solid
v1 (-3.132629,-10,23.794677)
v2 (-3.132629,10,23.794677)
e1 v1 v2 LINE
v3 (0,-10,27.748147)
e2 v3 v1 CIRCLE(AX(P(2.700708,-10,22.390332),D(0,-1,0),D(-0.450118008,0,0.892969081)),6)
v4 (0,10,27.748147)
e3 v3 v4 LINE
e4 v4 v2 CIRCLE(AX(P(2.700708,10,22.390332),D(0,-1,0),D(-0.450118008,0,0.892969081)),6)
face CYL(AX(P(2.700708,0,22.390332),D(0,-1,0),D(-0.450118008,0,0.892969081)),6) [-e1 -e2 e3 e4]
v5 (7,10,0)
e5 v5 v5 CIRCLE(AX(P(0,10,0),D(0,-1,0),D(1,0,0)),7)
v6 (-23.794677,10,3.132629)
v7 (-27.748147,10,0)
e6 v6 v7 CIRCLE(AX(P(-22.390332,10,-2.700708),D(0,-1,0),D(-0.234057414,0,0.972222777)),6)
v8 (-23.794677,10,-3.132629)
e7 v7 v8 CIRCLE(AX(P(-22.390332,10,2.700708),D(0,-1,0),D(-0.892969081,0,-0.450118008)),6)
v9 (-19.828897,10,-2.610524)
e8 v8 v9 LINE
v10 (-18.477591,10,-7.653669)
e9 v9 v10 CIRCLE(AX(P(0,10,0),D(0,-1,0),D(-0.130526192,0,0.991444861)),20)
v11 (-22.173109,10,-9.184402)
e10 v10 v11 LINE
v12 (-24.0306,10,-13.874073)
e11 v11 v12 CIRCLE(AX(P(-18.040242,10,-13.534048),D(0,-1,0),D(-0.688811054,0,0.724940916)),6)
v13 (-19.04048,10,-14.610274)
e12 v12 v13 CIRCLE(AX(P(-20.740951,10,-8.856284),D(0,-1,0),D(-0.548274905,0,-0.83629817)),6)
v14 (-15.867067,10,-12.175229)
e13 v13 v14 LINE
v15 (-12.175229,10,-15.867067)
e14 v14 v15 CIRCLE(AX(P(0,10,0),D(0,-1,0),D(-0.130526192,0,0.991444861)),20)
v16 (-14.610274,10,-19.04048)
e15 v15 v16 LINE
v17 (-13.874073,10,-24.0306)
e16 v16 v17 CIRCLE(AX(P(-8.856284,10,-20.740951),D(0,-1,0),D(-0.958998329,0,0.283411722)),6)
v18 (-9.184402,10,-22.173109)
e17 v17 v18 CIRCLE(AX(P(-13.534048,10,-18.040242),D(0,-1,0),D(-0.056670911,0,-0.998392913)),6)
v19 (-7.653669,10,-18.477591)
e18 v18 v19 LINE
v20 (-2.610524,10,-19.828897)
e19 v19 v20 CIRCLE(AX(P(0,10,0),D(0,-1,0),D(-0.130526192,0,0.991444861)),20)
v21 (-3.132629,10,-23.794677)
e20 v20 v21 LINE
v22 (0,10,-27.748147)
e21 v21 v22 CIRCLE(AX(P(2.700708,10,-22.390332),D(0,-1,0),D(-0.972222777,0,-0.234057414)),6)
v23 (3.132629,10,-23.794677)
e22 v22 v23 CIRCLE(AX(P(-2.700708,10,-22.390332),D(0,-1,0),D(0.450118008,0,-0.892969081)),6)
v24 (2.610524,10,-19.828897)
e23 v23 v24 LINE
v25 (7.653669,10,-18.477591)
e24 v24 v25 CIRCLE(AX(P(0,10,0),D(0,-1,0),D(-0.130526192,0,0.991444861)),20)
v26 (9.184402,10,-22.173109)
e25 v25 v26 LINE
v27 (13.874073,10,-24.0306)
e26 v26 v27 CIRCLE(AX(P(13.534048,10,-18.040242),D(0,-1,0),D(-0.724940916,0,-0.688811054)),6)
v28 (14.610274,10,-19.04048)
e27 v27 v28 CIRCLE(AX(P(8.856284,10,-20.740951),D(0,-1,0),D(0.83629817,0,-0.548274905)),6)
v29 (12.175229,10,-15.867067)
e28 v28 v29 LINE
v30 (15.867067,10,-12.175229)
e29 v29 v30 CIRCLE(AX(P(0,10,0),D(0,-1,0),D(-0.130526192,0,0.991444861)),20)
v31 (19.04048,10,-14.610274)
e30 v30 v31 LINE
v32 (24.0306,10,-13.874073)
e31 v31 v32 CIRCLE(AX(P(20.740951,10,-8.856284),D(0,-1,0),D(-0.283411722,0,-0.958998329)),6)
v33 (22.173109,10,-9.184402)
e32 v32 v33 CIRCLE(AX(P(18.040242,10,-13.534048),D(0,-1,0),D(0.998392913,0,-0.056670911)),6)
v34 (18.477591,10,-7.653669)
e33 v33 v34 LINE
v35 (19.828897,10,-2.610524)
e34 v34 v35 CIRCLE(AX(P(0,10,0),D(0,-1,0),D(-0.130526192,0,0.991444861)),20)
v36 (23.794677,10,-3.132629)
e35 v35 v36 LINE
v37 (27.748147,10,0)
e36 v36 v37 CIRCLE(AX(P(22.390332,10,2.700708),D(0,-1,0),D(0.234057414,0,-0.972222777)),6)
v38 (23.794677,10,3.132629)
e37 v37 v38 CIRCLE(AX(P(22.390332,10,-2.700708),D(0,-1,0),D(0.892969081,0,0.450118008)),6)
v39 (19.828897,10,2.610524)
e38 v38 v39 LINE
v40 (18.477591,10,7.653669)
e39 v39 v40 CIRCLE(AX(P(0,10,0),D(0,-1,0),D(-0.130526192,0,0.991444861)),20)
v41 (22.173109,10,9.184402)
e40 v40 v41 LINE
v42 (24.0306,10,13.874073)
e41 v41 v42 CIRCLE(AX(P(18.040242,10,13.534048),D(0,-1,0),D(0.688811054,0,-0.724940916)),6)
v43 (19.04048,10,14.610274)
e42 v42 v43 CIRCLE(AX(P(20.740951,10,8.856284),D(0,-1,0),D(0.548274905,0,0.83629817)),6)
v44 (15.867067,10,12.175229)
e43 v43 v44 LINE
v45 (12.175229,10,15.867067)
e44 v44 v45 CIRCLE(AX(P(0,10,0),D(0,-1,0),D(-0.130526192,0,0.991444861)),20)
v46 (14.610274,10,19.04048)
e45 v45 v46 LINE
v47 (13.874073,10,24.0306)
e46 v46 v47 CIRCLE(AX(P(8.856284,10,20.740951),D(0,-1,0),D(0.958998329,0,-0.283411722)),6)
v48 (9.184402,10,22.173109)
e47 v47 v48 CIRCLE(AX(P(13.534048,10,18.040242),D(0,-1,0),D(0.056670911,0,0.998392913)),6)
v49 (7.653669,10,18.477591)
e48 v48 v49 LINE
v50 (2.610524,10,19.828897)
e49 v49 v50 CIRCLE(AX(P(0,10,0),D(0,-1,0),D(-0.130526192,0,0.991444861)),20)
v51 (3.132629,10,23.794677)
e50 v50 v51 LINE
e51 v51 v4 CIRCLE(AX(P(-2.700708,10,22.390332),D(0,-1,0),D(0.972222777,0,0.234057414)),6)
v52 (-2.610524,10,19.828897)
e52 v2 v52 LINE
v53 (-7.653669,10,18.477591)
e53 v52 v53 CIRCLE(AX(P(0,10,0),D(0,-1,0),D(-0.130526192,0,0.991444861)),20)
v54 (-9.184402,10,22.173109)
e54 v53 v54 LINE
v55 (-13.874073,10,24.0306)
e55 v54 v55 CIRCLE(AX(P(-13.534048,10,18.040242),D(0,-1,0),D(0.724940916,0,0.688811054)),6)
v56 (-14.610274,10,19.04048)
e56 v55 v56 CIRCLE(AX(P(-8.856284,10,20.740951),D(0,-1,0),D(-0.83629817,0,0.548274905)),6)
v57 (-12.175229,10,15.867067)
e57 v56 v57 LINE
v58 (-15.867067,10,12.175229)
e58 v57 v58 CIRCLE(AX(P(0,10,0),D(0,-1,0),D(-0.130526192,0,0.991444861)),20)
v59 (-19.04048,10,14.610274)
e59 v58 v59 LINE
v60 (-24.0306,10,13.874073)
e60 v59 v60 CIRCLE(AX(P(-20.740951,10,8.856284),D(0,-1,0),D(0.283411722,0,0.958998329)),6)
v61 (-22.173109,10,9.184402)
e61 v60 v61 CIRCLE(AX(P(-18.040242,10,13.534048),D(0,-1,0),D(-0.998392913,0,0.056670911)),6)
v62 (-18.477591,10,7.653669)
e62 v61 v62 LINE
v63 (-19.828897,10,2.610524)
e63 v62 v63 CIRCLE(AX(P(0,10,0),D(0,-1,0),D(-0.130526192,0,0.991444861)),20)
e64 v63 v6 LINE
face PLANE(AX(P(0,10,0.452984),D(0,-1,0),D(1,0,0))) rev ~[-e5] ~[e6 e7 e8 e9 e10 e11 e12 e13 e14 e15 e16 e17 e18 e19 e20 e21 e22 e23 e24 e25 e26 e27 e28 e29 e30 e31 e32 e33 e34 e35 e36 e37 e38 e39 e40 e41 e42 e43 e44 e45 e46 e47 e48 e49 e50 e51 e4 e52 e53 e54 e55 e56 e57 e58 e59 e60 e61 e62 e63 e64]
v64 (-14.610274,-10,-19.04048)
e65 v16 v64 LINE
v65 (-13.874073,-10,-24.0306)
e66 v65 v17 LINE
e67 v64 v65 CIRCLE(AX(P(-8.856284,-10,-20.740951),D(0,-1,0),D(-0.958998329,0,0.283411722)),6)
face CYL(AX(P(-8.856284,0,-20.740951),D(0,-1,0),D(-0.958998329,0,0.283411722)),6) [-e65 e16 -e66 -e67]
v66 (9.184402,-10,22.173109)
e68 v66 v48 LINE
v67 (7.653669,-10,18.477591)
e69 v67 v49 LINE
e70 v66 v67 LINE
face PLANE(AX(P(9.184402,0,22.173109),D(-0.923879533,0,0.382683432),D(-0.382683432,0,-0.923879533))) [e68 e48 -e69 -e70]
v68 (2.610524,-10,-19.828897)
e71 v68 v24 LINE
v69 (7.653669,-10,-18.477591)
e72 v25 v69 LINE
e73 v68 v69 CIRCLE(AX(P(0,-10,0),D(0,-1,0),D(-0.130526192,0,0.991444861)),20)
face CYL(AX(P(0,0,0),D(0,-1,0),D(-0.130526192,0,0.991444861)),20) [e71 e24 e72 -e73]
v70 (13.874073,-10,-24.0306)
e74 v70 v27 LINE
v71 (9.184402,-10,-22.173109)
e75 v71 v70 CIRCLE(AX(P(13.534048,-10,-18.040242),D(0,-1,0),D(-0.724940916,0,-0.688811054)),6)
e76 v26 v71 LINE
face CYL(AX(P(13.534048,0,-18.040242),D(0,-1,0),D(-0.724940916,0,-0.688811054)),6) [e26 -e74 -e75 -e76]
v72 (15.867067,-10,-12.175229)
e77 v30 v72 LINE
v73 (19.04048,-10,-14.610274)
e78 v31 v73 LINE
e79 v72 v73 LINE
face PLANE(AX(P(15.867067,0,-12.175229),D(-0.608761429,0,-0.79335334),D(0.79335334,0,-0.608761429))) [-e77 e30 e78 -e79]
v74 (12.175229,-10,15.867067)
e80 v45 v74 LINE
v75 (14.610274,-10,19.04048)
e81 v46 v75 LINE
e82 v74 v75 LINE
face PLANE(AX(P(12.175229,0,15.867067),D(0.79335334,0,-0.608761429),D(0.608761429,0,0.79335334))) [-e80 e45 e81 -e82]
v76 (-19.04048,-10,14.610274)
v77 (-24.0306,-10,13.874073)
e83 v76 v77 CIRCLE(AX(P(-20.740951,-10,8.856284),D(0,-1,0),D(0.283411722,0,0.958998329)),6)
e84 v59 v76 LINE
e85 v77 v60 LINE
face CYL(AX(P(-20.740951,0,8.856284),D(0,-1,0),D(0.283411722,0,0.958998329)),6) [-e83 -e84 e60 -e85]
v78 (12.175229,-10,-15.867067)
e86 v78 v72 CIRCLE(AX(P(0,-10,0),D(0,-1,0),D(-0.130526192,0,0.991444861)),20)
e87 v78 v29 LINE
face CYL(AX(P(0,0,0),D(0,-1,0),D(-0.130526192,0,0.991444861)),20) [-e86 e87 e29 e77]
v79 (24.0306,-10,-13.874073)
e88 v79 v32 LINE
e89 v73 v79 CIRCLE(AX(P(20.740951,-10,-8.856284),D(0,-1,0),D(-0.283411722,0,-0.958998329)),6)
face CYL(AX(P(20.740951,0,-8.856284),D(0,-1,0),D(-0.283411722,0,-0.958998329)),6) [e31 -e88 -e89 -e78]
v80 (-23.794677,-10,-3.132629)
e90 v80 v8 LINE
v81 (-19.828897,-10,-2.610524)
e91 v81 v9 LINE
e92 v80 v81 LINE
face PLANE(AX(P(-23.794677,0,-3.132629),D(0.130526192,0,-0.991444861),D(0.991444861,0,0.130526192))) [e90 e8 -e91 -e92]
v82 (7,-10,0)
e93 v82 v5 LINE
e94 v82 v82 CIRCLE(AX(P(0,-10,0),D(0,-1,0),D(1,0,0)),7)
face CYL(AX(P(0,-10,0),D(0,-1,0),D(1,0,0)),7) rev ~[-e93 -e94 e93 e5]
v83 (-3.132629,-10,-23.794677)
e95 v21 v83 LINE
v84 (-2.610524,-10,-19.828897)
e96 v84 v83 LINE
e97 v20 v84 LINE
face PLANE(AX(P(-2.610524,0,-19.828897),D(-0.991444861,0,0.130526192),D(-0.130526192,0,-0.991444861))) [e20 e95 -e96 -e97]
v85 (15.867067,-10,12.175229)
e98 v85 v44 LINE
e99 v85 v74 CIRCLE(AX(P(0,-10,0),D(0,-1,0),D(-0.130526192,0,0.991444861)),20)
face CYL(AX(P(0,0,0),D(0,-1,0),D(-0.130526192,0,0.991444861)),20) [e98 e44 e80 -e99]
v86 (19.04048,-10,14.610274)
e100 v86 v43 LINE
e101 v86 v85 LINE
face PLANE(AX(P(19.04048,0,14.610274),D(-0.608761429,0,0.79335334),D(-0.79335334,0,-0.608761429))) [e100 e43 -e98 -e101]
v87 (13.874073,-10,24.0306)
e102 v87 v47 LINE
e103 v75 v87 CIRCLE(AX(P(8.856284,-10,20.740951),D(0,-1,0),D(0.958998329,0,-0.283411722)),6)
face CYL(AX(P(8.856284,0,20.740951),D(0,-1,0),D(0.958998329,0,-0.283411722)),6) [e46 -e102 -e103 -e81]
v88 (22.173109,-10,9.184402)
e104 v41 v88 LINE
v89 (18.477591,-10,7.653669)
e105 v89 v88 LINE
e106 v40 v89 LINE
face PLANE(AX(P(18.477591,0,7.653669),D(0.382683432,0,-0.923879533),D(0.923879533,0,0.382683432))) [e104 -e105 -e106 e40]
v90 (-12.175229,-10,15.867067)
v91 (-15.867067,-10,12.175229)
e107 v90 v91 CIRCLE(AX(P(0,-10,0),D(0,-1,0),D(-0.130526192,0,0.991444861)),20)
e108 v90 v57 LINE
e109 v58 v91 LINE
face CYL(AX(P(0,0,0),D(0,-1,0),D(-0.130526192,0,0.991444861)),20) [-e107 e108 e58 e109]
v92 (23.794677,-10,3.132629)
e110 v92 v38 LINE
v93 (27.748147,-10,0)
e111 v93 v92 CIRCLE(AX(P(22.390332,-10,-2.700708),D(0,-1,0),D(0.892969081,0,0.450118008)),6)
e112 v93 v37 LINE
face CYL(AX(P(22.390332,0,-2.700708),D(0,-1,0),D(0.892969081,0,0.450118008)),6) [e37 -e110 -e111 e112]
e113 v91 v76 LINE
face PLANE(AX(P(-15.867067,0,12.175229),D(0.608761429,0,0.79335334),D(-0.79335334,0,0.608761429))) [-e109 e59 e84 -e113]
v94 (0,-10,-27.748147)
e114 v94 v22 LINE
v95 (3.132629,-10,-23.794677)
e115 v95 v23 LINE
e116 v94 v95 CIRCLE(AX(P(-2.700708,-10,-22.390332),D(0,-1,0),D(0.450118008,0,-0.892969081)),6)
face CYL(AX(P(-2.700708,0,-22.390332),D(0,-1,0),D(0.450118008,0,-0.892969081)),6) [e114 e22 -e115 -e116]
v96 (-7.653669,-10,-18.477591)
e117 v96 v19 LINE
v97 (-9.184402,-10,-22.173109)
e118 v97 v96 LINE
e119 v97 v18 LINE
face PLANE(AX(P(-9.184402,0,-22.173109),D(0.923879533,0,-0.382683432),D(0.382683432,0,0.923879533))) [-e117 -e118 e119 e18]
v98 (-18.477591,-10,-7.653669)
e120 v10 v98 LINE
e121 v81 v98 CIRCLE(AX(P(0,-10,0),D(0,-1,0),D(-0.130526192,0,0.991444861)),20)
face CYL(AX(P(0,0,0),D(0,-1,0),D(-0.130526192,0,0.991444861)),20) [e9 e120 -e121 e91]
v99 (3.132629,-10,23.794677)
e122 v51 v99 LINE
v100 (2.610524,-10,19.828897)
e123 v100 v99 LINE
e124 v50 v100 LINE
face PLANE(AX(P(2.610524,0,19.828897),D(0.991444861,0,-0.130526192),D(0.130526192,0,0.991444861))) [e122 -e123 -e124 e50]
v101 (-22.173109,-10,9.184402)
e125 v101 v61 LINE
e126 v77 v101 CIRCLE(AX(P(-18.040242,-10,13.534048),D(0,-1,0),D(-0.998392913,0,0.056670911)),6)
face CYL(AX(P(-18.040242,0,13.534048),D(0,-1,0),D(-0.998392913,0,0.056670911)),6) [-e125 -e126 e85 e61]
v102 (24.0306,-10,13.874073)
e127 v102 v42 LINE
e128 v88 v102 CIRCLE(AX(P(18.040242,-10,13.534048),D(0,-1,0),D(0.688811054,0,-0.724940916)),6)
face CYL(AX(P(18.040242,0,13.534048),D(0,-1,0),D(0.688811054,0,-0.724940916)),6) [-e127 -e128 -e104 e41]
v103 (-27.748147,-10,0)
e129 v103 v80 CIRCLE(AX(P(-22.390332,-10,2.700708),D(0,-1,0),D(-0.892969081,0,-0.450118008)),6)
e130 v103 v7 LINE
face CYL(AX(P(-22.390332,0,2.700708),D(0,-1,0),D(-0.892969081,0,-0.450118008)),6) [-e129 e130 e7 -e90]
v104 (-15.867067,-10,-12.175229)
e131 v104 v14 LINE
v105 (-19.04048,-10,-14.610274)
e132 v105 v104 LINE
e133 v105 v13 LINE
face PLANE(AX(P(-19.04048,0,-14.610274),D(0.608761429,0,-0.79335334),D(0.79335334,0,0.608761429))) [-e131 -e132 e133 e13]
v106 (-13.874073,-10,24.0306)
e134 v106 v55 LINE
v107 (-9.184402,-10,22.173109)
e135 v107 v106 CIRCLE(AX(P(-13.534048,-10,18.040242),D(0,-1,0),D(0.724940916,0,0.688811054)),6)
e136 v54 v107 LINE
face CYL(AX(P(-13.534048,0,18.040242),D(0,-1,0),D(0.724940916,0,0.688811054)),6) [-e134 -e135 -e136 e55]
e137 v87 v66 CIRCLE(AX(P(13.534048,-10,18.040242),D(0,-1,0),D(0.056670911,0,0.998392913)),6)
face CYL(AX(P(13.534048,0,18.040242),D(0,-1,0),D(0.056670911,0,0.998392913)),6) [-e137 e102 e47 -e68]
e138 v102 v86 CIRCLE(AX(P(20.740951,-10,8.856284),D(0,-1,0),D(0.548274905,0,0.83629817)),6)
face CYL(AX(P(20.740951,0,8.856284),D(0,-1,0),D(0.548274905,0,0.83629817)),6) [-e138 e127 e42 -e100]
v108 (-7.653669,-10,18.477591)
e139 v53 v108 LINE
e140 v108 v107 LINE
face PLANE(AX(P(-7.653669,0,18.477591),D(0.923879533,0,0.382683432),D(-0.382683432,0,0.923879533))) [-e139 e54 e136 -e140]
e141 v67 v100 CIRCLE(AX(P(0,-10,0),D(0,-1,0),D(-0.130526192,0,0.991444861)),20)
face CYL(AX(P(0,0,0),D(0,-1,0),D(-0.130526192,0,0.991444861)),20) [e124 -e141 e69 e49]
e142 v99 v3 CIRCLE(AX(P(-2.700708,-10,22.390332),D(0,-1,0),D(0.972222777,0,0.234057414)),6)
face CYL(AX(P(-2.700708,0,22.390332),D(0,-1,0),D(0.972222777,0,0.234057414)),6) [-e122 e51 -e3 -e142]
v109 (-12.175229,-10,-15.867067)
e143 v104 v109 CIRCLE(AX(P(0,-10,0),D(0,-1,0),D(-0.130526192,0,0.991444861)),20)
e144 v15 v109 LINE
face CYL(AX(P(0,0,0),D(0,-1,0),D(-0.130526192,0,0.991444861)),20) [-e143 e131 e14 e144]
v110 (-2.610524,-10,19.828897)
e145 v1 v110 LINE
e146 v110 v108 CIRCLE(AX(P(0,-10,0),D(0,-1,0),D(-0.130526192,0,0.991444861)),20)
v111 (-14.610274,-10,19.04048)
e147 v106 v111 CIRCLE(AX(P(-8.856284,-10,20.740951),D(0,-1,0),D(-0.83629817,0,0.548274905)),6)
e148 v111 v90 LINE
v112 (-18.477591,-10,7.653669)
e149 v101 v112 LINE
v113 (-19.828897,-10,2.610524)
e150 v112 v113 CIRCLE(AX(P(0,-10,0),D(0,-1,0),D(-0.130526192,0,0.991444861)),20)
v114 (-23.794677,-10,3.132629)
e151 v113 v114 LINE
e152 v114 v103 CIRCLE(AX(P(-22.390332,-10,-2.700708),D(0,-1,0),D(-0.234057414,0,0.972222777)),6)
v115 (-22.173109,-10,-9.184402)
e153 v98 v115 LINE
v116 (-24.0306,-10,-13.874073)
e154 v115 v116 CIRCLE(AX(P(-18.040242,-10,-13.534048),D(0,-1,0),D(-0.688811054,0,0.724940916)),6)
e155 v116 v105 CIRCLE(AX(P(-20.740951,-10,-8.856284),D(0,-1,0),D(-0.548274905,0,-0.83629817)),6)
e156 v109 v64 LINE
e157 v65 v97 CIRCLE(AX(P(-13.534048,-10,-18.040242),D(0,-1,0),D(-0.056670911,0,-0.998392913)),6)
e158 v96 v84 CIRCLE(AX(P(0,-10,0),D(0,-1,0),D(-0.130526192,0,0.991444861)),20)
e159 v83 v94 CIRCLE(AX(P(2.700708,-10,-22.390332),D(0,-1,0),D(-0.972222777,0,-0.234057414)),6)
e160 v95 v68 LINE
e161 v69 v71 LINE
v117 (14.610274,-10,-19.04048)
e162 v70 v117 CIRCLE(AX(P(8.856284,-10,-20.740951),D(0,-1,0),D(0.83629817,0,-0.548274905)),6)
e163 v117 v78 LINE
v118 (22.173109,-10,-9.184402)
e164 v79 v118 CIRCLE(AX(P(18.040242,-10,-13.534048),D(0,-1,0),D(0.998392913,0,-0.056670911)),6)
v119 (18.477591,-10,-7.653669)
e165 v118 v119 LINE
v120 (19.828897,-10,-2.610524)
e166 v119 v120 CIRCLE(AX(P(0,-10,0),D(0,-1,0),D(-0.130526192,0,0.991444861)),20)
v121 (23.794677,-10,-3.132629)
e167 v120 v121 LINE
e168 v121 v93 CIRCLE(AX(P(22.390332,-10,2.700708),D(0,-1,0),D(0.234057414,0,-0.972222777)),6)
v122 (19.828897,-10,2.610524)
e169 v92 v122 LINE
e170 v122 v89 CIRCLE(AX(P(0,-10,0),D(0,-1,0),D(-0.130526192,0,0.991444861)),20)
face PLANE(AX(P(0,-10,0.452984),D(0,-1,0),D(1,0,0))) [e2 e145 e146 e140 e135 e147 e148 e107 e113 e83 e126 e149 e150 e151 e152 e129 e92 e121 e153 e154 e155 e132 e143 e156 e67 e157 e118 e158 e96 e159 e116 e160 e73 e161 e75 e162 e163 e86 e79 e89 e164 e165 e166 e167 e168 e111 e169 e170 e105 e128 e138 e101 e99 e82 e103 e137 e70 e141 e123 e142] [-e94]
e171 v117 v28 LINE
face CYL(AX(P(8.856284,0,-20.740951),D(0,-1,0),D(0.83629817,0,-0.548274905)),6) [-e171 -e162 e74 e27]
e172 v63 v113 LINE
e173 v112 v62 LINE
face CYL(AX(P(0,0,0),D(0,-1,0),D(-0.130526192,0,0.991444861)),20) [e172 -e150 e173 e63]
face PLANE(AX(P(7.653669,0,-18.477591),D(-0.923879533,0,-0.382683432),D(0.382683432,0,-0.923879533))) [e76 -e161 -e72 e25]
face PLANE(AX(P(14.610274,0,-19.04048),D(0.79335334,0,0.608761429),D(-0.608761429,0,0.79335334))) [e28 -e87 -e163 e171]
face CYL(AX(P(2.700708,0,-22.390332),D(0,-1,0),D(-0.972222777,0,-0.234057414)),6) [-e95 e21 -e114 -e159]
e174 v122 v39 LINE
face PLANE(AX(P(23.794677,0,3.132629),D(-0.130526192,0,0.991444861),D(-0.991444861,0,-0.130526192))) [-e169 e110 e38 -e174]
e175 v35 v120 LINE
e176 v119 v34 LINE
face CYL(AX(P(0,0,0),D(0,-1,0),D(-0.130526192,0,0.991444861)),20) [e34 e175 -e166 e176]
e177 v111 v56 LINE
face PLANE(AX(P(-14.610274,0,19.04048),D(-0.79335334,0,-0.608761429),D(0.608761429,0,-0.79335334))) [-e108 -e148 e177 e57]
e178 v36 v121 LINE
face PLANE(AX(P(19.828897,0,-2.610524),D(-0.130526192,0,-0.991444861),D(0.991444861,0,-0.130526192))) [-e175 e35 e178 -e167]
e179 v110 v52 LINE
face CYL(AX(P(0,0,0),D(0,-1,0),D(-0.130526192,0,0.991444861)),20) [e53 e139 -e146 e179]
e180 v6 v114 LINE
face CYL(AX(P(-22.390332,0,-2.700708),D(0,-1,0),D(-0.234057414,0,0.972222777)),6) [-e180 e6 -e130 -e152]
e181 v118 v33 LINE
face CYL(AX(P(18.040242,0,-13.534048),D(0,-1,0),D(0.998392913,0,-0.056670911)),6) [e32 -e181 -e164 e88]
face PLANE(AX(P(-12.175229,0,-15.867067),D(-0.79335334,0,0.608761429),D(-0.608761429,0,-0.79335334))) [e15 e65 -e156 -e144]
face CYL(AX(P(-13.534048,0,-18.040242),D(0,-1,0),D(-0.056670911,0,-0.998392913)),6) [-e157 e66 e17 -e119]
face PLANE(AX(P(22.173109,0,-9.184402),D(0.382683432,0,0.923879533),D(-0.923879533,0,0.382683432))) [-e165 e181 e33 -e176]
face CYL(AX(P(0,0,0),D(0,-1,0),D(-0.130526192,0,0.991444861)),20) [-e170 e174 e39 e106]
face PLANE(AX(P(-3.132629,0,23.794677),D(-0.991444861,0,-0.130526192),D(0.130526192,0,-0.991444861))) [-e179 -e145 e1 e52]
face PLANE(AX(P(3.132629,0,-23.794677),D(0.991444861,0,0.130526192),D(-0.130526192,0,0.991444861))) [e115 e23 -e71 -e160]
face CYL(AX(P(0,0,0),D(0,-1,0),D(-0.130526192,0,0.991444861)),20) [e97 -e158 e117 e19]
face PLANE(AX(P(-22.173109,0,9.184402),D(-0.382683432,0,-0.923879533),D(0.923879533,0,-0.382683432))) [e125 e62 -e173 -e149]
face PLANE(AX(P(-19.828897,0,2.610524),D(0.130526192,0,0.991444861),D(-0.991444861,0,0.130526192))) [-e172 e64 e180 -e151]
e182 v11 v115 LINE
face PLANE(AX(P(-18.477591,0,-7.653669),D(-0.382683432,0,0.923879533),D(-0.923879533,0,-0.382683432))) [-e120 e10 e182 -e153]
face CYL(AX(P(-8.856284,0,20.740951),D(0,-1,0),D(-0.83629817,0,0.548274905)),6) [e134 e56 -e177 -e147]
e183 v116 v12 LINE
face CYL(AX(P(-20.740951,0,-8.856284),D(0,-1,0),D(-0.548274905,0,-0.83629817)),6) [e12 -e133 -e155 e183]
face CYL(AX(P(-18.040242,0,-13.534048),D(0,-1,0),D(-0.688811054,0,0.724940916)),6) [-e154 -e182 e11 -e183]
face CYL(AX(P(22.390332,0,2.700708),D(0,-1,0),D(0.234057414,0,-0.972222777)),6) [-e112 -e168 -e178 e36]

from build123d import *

# Parameters (mm, degrees)
F2_DEPTH        = 10
F2_COPIES_COUNT = 12
F4_R            = 7
F5_DEPTH        = 20.001


# Not quite as in the source:
# - a feature of the source that left no trace in its solid (it failed there, or was rolled back) is left out
# - a pattern or mirror of a feature is missing from the dataset's text; its kind, count and spacing are read off the source's solid


with BuildPart() as f2:
    # F1 (on Front) → F2 (new body, symmetric)
    with BuildSketch(Plane.XZ):
        with BuildLine():
            ThreePointArc((-2.6105238444, 19.8288972275), (-13.186916302, -15.0367961496), (20, 0))
            ThreePointArc((20, 0), (15.0367961496, 13.186916302), (2.6105238444, 19.8288972275))
            ThreePointArc((2.6105238444, 19.8288972275), (0, 20), (-2.6105238444, 19.8288972275))
        make_face()
        with BuildLine():
            ThreePointArc((-2.6105238444, 19.8288972275), (0, 20), (2.6105238444, 19.8288972275))
            Line((2.6105238444, 19.8288972275), (3.1326286133, 23.794676673))
            ThreePointArc((3.1326286133, 23.794676673), (2.0019466325, 26.1165955987), (0, 27.7481466766))
            ThreePointArc((0, 27.7481466766), (-2.0019466325, 26.1165955987), (-3.1326286133, 23.794676673))
            Line((-3.1326286133, 23.794676673), (-2.6105238444, 19.8288972275))
        make_face()
    extrude(amount=F2_DEPTH, both=True)

    # F2_copies: F2 ×12 about axis
    f2_copies_axis = Axis((0, 0, 0), (0, 1, 0))


with BuildPart() as f2_1:
    add(f2.part)
    for i in range(1, F2_COPIES_COUNT):
        add(f2.part.rotate(f2_copies_axis, i * 360 / F2_COPIES_COUNT))

    # F4 (on face) → F5 (cut, through all)
    with BuildSketch(Plane.XZ.offset(10)):
        Circle(F4_R)
    extrude(amount=-F5_DEPTH, mode=Mode.SUBTRACT)


solid = f2_1.part
